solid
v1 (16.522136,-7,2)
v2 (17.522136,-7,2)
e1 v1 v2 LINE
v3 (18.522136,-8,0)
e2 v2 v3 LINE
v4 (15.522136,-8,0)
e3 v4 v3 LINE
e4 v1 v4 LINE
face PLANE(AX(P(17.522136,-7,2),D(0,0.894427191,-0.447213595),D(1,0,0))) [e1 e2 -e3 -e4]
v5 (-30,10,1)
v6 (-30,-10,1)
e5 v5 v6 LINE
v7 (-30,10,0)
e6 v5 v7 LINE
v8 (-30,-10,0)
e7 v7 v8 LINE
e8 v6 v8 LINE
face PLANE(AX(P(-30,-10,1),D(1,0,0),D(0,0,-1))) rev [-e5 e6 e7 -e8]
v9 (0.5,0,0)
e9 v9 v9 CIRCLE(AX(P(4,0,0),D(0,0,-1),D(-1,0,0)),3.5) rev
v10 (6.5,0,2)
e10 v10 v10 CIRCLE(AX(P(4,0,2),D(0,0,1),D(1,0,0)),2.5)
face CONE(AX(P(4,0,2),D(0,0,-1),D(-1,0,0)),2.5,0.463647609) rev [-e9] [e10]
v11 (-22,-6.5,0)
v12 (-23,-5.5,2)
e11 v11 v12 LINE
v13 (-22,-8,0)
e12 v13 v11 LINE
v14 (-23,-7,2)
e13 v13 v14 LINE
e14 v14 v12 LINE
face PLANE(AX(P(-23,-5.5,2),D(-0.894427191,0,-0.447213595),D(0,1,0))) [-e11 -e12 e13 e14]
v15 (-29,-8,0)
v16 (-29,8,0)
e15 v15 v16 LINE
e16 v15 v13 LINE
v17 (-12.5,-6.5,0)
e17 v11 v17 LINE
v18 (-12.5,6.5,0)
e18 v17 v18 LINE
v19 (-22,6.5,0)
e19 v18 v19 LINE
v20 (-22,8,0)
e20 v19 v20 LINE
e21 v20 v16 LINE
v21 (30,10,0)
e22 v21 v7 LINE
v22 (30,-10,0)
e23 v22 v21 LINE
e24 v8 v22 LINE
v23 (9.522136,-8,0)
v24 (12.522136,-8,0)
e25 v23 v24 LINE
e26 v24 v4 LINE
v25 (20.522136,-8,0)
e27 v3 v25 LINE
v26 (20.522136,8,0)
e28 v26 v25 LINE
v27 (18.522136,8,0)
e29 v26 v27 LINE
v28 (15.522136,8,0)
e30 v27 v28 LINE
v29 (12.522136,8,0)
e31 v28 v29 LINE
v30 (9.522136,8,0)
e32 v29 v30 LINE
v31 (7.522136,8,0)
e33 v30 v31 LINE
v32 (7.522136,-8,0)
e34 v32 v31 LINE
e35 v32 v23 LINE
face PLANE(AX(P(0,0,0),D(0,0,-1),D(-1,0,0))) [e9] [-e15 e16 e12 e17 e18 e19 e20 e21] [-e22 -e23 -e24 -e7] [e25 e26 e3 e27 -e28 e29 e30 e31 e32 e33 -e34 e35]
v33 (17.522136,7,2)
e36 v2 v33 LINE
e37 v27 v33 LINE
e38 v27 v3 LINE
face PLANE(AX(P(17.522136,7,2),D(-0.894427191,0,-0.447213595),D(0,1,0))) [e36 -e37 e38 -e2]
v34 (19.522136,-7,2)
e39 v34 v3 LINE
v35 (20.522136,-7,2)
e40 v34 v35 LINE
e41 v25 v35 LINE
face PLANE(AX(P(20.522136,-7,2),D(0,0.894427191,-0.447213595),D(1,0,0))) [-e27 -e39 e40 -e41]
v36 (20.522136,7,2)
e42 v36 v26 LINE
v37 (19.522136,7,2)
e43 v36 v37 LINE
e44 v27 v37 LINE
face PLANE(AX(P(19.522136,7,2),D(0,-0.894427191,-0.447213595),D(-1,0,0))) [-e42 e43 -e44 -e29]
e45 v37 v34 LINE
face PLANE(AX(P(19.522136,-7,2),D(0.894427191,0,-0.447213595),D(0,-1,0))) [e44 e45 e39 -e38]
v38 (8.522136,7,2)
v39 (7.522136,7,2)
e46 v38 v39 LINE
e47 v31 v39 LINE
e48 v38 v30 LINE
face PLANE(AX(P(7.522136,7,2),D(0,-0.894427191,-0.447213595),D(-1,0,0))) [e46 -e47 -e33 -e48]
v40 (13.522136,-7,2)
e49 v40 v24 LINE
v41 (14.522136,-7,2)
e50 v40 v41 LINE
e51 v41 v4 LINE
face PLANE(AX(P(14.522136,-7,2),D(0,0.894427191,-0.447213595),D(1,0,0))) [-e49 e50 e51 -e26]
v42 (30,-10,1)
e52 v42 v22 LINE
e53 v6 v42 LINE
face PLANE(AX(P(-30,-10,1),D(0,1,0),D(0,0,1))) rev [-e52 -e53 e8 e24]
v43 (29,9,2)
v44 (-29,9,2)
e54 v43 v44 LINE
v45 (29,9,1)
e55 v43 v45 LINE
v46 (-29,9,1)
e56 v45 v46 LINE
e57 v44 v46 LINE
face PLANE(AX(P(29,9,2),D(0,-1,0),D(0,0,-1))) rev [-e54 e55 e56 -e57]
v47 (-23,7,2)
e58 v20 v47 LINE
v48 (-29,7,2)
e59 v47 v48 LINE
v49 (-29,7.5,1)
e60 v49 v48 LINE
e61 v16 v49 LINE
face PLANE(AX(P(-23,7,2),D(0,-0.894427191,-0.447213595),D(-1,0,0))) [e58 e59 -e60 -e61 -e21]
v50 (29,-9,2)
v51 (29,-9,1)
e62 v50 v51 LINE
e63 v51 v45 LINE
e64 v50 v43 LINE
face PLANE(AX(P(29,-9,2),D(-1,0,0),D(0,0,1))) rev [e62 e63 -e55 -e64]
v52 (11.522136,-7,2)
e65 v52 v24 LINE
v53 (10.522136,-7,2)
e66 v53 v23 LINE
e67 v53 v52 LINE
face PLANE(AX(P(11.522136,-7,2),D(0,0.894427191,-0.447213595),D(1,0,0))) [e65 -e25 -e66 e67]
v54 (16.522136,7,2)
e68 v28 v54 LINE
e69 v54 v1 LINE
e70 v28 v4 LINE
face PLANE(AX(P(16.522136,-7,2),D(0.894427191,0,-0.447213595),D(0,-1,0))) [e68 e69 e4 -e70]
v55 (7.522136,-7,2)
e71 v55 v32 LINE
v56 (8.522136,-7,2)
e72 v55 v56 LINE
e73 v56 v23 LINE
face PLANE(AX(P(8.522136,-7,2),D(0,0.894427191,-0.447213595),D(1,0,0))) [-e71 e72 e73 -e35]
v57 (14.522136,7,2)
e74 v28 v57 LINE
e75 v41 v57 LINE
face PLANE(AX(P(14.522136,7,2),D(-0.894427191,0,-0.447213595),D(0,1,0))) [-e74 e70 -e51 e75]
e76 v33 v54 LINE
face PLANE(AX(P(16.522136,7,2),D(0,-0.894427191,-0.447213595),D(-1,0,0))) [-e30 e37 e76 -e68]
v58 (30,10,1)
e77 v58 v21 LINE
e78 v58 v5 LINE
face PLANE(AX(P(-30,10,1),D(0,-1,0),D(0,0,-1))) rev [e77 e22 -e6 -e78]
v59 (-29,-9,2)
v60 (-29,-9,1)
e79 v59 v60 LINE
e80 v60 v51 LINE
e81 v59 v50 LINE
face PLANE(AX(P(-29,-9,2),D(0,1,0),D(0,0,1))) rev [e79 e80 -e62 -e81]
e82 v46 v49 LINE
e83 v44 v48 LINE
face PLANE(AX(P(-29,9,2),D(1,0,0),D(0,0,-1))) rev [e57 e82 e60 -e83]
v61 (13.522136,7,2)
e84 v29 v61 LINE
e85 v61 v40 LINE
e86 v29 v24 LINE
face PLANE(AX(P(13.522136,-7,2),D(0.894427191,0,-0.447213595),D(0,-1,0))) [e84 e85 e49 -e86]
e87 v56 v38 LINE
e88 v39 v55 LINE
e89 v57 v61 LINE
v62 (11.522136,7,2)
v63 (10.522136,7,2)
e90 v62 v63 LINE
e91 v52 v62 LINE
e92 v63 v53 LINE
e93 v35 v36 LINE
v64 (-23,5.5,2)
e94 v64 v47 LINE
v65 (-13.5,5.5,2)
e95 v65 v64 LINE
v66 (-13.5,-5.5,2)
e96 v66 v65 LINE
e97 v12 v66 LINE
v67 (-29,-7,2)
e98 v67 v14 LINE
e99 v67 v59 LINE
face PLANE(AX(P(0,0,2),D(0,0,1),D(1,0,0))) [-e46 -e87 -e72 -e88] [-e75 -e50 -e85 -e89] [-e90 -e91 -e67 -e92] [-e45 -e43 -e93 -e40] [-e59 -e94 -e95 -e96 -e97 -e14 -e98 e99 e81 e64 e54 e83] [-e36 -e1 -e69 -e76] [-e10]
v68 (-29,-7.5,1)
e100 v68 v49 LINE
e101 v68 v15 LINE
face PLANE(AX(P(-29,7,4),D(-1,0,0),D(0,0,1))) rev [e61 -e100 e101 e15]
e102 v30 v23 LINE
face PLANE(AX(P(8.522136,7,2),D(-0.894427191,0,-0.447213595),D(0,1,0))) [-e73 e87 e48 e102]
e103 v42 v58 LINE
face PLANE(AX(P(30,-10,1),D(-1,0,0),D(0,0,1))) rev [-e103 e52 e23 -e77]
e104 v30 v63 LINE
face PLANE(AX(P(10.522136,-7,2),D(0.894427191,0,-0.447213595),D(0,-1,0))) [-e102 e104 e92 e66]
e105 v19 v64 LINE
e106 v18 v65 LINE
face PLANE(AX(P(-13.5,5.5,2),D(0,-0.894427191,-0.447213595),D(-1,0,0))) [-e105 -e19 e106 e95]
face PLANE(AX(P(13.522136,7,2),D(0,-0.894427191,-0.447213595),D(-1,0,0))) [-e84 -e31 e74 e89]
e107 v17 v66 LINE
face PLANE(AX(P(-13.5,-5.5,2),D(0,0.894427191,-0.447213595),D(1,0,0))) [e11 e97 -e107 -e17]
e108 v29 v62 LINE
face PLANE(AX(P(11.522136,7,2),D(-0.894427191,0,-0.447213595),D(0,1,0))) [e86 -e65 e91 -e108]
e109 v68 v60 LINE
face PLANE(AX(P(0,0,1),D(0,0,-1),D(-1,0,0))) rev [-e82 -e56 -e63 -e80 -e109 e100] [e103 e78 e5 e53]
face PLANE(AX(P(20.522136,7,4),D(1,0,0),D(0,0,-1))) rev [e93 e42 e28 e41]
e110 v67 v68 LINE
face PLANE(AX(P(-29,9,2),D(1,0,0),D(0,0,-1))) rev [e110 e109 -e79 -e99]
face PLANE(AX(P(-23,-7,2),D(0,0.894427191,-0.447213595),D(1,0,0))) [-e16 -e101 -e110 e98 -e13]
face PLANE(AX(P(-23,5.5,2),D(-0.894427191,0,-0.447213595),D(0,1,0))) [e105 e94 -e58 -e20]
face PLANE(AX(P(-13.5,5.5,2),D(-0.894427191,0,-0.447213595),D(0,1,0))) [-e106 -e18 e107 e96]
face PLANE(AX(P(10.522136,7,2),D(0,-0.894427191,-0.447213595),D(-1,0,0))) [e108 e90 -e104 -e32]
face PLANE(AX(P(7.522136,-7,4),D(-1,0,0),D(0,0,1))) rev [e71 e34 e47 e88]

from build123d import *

# Parameters (mm, degrees)
SKETCH1_W           = 60
SKETCH1_H           = 20
BOSS_EXTRUDE1_DEPTH = 1
SKETCH2_W           = 58
SKETCH2_H           = 18
BOSS_EXTRUDE2_DEPTH = 1
SKETCH4_R           = 2.5
SKETCH4_W           = 1
SKETCH4_H           = 14
CUT_EXTRUDE2_DEPTH  = 4
CHAMFER2_START      = 7.522135998
CHAMFER2_2_DEPTH    = 13
CHAMFER2_START_2    = -23
CHAMFER2_3_DEPTH    = 10.5
CHAMFER2_START_3    = -29
CHAMFER2_4_DEPTH    = 7
CHAMFER2_START_4    = -7
CHAMFER2_5_DEPTH    = 14
CHAMFER2_START_5    = -5.5
CHAMFER2_6_DEPTH    = 11
CHAMFER2_START_6    = -9
CHAMFER2_7_DEPTH    = 18
CHAMFER2_8_DEPTH    = 2
CHAMFER2_START_7    = 7
CHAMFER2_9_DEPTH    = 2


with BuildPart() as part:
    # Sketch1 → Boss-Extrude1 (new body)
    with BuildSketch(Plane.XY):
        Rectangle(SKETCH1_W, SKETCH1_H)
    extrude(amount=BOSS_EXTRUDE1_DEPTH)

    # Sketch2 → Boss-Extrude2 (add)
    with BuildSketch(Plane.XY.offset(1)):
        Rectangle(SKETCH2_W, SKETCH2_H)
    extrude(amount=BOSS_EXTRUDE2_DEPTH)

    # Sketch4 → Cut-Extrude2 (cut)
    with BuildSketch(Plane(origin=(0, 0, 0), x_dir=(-1, 0, 0), z_dir=(0, 0, -1))):
        with Locations((-4, 0)):
            Circle(SKETCH4_R)
        Polygon((13.5, -5.5), (23, -5.5), (23, -7), (29, -7), (29, -5.5), (29, 5.5), (29, 7), (23, 7), (23, 5.5), (13.5, 5.5), align=None)
        with Locations((-20.022135998, 0)):
            Rectangle(SKETCH4_W, SKETCH4_H)
        with Locations((-17.022135998, 0)):
            Rectangle(SKETCH4_W, SKETCH4_H)
        with Locations((-14.022135998, 0)):
            Rectangle(SKETCH4_W, SKETCH4_H)
        with Locations((-11.022135998, 0)):
            Rectangle(SKETCH4_W, SKETCH4_H)
        with Locations((-8.022135998, 0)):
            Rectangle(SKETCH4_W, SKETCH4_H)
    extrude(amount=-CUT_EXTRUDE2_DEPTH, mode=Mode.SUBTRACT)

    # Chamfer2: read off the stored shape, not the designer's step
    # Chamfer2 outline → Chamfer2 (revolve, cut)
    with BuildSketch(Plane(origin=(4, 0, 0), x_dir=(1, 0, 0), z_dir=(0, -1, 0))):
        Polygon((3.5, 0), (2.5, 2), (2.5, 0), align=None)
    revolve(axis=Axis((4, 0, 0), (0, 0, 1)), mode=Mode.SUBTRACT)

    # Chamfer2 2 outline → Chamfer2 2 (cut)
    with BuildSketch(Plane.YZ.offset(CHAMFER2_START)):
        Polygon((7, 2), (7, 0), (8, 0), align=None)
        Polygon((5.5, 2), (5.5, 0), (6.5, 0), align=None)
        Polygon((-5.5, 2), (-6.5, 0), (-5.5, 0), align=None)
        Polygon((-7, 2), (-8, 0), (-7, 0), align=None)
    extrude(amount=CHAMFER2_2_DEPTH, mode=Mode.SUBTRACT)

    # Chamfer2 3 outline → Chamfer2 3 (cut)
    with BuildSketch(Plane.YZ.offset(CHAMFER2_START_2)):
        Polygon((5.5, 2), (5.5, 0), (6.5, 0), align=None)
        Polygon((-5.5, 2), (-6.5, 0), (-5.5, 0), align=None)
    extrude(amount=CHAMFER2_3_DEPTH, mode=Mode.SUBTRACT)

    # Chamfer2 4 outline → Chamfer2 4 (cut)
    with BuildSketch(Plane.YZ.offset(CHAMFER2_START_3)):
        Polygon((7, 2), (7, 0), (8, 0), align=None)
        Polygon((-7, 2), (-8, 0), (-7, 0), align=None)
    extrude(amount=CHAMFER2_4_DEPTH, mode=Mode.SUBTRACT)

    # Chamfer2 5 outline → Chamfer2 5 (cut)
    with BuildSketch(Plane(origin=(0, 0, 0), x_dir=(1, 0, 0), z_dir=(0, 1, 0)).offset(CHAMFER2_START_4)):
        Polygon((18.522135998, 0), (19.522135998, -2), (19.522135998, 0), align=None)
        Polygon((17.522135998, -2), (18.522135998, 0), (17.522135998, 0), align=None)
        Polygon((15.522135998, 0), (16.522135998, -2), (16.522135998, 0), align=None)
        Polygon((14.522135998, -2), (15.522135998, 0), (14.522135998, 0), align=None)
        Polygon((12.522135998, 0), (13.522135998, -2), (13.522135998, 0), align=None)
        Polygon((11.522135998, -2), (12.522135998, 0), (11.522135998, 0), align=None)
        Polygon((9.522135998, 0), (10.522135998, -2), (10.522135998, 0), align=None)
        Polygon((8.522135998, -2), (9.522135998, 0), (8.522135998, 0), align=None)
        Polygon((-23, -2), (-22, 0), (-23, 0), align=None)
    extrude(amount=CHAMFER2_5_DEPTH, mode=Mode.SUBTRACT)

    # Chamfer2 6 outline → Chamfer2 6 (cut)
    with BuildSketch(Plane(origin=(0, 0, 0), x_dir=(1, 0, 0), z_dir=(0, 1, 0)).offset(CHAMFER2_START_5)):
        Polygon((-13.5, -2), (-12.5, 0), (-13.5, 0), align=None)
    extrude(amount=CHAMFER2_6_DEPTH, mode=Mode.SUBTRACT)

    # Chamfer2 7 outline → Chamfer2 7 (add)
    with BuildSketch(Plane(origin=(0, 0, 0), x_dir=(1, 0, 0), z_dir=(0, 1, 0)).offset(CHAMFER2_START_6)):
        Polygon((17.522135998, -2), (19.522135998, -2), (18.522135998, 0), align=None)
        Polygon((14.522135998, -2), (16.522135998, -2), (15.522135998, 0), align=None)
        Polygon((11.522135998, -2), (13.522135998, -2), (12.522135998, 0), align=None)
        Polygon((8.522135998, -2), (10.522135998, -2), (9.522135998, 0), align=None)
        Polygon((-13.5, -2), (-12.5, -2), (-12.5, 0), align=None)
    extrude(amount=CHAMFER2_7_DEPTH)

    # Chamfer2 8 outline → Chamfer2 8 (add)
    with BuildSketch(Plane(origin=(0, 0, 0), x_dir=(1, 0, 0), z_dir=(0, 1, 0)).offset(CHAMFER2_START_6)):
        Polygon((-23, -2), (-22, -2), (-22, 0), align=None)
    extrude(amount=CHAMFER2_8_DEPTH)

    # Chamfer2 9 outline → Chamfer2 9 (add)
    with BuildSketch(Plane(origin=(0, 0, 0), x_dir=(1, 0, 0), z_dir=(0, 1, 0)).offset(CHAMFER2_START_7)):
        Polygon((-23, -2), (-22, -2), (-22, 0), align=None)
    extrude(amount=CHAMFER2_9_DEPTH)


solid = part.part
